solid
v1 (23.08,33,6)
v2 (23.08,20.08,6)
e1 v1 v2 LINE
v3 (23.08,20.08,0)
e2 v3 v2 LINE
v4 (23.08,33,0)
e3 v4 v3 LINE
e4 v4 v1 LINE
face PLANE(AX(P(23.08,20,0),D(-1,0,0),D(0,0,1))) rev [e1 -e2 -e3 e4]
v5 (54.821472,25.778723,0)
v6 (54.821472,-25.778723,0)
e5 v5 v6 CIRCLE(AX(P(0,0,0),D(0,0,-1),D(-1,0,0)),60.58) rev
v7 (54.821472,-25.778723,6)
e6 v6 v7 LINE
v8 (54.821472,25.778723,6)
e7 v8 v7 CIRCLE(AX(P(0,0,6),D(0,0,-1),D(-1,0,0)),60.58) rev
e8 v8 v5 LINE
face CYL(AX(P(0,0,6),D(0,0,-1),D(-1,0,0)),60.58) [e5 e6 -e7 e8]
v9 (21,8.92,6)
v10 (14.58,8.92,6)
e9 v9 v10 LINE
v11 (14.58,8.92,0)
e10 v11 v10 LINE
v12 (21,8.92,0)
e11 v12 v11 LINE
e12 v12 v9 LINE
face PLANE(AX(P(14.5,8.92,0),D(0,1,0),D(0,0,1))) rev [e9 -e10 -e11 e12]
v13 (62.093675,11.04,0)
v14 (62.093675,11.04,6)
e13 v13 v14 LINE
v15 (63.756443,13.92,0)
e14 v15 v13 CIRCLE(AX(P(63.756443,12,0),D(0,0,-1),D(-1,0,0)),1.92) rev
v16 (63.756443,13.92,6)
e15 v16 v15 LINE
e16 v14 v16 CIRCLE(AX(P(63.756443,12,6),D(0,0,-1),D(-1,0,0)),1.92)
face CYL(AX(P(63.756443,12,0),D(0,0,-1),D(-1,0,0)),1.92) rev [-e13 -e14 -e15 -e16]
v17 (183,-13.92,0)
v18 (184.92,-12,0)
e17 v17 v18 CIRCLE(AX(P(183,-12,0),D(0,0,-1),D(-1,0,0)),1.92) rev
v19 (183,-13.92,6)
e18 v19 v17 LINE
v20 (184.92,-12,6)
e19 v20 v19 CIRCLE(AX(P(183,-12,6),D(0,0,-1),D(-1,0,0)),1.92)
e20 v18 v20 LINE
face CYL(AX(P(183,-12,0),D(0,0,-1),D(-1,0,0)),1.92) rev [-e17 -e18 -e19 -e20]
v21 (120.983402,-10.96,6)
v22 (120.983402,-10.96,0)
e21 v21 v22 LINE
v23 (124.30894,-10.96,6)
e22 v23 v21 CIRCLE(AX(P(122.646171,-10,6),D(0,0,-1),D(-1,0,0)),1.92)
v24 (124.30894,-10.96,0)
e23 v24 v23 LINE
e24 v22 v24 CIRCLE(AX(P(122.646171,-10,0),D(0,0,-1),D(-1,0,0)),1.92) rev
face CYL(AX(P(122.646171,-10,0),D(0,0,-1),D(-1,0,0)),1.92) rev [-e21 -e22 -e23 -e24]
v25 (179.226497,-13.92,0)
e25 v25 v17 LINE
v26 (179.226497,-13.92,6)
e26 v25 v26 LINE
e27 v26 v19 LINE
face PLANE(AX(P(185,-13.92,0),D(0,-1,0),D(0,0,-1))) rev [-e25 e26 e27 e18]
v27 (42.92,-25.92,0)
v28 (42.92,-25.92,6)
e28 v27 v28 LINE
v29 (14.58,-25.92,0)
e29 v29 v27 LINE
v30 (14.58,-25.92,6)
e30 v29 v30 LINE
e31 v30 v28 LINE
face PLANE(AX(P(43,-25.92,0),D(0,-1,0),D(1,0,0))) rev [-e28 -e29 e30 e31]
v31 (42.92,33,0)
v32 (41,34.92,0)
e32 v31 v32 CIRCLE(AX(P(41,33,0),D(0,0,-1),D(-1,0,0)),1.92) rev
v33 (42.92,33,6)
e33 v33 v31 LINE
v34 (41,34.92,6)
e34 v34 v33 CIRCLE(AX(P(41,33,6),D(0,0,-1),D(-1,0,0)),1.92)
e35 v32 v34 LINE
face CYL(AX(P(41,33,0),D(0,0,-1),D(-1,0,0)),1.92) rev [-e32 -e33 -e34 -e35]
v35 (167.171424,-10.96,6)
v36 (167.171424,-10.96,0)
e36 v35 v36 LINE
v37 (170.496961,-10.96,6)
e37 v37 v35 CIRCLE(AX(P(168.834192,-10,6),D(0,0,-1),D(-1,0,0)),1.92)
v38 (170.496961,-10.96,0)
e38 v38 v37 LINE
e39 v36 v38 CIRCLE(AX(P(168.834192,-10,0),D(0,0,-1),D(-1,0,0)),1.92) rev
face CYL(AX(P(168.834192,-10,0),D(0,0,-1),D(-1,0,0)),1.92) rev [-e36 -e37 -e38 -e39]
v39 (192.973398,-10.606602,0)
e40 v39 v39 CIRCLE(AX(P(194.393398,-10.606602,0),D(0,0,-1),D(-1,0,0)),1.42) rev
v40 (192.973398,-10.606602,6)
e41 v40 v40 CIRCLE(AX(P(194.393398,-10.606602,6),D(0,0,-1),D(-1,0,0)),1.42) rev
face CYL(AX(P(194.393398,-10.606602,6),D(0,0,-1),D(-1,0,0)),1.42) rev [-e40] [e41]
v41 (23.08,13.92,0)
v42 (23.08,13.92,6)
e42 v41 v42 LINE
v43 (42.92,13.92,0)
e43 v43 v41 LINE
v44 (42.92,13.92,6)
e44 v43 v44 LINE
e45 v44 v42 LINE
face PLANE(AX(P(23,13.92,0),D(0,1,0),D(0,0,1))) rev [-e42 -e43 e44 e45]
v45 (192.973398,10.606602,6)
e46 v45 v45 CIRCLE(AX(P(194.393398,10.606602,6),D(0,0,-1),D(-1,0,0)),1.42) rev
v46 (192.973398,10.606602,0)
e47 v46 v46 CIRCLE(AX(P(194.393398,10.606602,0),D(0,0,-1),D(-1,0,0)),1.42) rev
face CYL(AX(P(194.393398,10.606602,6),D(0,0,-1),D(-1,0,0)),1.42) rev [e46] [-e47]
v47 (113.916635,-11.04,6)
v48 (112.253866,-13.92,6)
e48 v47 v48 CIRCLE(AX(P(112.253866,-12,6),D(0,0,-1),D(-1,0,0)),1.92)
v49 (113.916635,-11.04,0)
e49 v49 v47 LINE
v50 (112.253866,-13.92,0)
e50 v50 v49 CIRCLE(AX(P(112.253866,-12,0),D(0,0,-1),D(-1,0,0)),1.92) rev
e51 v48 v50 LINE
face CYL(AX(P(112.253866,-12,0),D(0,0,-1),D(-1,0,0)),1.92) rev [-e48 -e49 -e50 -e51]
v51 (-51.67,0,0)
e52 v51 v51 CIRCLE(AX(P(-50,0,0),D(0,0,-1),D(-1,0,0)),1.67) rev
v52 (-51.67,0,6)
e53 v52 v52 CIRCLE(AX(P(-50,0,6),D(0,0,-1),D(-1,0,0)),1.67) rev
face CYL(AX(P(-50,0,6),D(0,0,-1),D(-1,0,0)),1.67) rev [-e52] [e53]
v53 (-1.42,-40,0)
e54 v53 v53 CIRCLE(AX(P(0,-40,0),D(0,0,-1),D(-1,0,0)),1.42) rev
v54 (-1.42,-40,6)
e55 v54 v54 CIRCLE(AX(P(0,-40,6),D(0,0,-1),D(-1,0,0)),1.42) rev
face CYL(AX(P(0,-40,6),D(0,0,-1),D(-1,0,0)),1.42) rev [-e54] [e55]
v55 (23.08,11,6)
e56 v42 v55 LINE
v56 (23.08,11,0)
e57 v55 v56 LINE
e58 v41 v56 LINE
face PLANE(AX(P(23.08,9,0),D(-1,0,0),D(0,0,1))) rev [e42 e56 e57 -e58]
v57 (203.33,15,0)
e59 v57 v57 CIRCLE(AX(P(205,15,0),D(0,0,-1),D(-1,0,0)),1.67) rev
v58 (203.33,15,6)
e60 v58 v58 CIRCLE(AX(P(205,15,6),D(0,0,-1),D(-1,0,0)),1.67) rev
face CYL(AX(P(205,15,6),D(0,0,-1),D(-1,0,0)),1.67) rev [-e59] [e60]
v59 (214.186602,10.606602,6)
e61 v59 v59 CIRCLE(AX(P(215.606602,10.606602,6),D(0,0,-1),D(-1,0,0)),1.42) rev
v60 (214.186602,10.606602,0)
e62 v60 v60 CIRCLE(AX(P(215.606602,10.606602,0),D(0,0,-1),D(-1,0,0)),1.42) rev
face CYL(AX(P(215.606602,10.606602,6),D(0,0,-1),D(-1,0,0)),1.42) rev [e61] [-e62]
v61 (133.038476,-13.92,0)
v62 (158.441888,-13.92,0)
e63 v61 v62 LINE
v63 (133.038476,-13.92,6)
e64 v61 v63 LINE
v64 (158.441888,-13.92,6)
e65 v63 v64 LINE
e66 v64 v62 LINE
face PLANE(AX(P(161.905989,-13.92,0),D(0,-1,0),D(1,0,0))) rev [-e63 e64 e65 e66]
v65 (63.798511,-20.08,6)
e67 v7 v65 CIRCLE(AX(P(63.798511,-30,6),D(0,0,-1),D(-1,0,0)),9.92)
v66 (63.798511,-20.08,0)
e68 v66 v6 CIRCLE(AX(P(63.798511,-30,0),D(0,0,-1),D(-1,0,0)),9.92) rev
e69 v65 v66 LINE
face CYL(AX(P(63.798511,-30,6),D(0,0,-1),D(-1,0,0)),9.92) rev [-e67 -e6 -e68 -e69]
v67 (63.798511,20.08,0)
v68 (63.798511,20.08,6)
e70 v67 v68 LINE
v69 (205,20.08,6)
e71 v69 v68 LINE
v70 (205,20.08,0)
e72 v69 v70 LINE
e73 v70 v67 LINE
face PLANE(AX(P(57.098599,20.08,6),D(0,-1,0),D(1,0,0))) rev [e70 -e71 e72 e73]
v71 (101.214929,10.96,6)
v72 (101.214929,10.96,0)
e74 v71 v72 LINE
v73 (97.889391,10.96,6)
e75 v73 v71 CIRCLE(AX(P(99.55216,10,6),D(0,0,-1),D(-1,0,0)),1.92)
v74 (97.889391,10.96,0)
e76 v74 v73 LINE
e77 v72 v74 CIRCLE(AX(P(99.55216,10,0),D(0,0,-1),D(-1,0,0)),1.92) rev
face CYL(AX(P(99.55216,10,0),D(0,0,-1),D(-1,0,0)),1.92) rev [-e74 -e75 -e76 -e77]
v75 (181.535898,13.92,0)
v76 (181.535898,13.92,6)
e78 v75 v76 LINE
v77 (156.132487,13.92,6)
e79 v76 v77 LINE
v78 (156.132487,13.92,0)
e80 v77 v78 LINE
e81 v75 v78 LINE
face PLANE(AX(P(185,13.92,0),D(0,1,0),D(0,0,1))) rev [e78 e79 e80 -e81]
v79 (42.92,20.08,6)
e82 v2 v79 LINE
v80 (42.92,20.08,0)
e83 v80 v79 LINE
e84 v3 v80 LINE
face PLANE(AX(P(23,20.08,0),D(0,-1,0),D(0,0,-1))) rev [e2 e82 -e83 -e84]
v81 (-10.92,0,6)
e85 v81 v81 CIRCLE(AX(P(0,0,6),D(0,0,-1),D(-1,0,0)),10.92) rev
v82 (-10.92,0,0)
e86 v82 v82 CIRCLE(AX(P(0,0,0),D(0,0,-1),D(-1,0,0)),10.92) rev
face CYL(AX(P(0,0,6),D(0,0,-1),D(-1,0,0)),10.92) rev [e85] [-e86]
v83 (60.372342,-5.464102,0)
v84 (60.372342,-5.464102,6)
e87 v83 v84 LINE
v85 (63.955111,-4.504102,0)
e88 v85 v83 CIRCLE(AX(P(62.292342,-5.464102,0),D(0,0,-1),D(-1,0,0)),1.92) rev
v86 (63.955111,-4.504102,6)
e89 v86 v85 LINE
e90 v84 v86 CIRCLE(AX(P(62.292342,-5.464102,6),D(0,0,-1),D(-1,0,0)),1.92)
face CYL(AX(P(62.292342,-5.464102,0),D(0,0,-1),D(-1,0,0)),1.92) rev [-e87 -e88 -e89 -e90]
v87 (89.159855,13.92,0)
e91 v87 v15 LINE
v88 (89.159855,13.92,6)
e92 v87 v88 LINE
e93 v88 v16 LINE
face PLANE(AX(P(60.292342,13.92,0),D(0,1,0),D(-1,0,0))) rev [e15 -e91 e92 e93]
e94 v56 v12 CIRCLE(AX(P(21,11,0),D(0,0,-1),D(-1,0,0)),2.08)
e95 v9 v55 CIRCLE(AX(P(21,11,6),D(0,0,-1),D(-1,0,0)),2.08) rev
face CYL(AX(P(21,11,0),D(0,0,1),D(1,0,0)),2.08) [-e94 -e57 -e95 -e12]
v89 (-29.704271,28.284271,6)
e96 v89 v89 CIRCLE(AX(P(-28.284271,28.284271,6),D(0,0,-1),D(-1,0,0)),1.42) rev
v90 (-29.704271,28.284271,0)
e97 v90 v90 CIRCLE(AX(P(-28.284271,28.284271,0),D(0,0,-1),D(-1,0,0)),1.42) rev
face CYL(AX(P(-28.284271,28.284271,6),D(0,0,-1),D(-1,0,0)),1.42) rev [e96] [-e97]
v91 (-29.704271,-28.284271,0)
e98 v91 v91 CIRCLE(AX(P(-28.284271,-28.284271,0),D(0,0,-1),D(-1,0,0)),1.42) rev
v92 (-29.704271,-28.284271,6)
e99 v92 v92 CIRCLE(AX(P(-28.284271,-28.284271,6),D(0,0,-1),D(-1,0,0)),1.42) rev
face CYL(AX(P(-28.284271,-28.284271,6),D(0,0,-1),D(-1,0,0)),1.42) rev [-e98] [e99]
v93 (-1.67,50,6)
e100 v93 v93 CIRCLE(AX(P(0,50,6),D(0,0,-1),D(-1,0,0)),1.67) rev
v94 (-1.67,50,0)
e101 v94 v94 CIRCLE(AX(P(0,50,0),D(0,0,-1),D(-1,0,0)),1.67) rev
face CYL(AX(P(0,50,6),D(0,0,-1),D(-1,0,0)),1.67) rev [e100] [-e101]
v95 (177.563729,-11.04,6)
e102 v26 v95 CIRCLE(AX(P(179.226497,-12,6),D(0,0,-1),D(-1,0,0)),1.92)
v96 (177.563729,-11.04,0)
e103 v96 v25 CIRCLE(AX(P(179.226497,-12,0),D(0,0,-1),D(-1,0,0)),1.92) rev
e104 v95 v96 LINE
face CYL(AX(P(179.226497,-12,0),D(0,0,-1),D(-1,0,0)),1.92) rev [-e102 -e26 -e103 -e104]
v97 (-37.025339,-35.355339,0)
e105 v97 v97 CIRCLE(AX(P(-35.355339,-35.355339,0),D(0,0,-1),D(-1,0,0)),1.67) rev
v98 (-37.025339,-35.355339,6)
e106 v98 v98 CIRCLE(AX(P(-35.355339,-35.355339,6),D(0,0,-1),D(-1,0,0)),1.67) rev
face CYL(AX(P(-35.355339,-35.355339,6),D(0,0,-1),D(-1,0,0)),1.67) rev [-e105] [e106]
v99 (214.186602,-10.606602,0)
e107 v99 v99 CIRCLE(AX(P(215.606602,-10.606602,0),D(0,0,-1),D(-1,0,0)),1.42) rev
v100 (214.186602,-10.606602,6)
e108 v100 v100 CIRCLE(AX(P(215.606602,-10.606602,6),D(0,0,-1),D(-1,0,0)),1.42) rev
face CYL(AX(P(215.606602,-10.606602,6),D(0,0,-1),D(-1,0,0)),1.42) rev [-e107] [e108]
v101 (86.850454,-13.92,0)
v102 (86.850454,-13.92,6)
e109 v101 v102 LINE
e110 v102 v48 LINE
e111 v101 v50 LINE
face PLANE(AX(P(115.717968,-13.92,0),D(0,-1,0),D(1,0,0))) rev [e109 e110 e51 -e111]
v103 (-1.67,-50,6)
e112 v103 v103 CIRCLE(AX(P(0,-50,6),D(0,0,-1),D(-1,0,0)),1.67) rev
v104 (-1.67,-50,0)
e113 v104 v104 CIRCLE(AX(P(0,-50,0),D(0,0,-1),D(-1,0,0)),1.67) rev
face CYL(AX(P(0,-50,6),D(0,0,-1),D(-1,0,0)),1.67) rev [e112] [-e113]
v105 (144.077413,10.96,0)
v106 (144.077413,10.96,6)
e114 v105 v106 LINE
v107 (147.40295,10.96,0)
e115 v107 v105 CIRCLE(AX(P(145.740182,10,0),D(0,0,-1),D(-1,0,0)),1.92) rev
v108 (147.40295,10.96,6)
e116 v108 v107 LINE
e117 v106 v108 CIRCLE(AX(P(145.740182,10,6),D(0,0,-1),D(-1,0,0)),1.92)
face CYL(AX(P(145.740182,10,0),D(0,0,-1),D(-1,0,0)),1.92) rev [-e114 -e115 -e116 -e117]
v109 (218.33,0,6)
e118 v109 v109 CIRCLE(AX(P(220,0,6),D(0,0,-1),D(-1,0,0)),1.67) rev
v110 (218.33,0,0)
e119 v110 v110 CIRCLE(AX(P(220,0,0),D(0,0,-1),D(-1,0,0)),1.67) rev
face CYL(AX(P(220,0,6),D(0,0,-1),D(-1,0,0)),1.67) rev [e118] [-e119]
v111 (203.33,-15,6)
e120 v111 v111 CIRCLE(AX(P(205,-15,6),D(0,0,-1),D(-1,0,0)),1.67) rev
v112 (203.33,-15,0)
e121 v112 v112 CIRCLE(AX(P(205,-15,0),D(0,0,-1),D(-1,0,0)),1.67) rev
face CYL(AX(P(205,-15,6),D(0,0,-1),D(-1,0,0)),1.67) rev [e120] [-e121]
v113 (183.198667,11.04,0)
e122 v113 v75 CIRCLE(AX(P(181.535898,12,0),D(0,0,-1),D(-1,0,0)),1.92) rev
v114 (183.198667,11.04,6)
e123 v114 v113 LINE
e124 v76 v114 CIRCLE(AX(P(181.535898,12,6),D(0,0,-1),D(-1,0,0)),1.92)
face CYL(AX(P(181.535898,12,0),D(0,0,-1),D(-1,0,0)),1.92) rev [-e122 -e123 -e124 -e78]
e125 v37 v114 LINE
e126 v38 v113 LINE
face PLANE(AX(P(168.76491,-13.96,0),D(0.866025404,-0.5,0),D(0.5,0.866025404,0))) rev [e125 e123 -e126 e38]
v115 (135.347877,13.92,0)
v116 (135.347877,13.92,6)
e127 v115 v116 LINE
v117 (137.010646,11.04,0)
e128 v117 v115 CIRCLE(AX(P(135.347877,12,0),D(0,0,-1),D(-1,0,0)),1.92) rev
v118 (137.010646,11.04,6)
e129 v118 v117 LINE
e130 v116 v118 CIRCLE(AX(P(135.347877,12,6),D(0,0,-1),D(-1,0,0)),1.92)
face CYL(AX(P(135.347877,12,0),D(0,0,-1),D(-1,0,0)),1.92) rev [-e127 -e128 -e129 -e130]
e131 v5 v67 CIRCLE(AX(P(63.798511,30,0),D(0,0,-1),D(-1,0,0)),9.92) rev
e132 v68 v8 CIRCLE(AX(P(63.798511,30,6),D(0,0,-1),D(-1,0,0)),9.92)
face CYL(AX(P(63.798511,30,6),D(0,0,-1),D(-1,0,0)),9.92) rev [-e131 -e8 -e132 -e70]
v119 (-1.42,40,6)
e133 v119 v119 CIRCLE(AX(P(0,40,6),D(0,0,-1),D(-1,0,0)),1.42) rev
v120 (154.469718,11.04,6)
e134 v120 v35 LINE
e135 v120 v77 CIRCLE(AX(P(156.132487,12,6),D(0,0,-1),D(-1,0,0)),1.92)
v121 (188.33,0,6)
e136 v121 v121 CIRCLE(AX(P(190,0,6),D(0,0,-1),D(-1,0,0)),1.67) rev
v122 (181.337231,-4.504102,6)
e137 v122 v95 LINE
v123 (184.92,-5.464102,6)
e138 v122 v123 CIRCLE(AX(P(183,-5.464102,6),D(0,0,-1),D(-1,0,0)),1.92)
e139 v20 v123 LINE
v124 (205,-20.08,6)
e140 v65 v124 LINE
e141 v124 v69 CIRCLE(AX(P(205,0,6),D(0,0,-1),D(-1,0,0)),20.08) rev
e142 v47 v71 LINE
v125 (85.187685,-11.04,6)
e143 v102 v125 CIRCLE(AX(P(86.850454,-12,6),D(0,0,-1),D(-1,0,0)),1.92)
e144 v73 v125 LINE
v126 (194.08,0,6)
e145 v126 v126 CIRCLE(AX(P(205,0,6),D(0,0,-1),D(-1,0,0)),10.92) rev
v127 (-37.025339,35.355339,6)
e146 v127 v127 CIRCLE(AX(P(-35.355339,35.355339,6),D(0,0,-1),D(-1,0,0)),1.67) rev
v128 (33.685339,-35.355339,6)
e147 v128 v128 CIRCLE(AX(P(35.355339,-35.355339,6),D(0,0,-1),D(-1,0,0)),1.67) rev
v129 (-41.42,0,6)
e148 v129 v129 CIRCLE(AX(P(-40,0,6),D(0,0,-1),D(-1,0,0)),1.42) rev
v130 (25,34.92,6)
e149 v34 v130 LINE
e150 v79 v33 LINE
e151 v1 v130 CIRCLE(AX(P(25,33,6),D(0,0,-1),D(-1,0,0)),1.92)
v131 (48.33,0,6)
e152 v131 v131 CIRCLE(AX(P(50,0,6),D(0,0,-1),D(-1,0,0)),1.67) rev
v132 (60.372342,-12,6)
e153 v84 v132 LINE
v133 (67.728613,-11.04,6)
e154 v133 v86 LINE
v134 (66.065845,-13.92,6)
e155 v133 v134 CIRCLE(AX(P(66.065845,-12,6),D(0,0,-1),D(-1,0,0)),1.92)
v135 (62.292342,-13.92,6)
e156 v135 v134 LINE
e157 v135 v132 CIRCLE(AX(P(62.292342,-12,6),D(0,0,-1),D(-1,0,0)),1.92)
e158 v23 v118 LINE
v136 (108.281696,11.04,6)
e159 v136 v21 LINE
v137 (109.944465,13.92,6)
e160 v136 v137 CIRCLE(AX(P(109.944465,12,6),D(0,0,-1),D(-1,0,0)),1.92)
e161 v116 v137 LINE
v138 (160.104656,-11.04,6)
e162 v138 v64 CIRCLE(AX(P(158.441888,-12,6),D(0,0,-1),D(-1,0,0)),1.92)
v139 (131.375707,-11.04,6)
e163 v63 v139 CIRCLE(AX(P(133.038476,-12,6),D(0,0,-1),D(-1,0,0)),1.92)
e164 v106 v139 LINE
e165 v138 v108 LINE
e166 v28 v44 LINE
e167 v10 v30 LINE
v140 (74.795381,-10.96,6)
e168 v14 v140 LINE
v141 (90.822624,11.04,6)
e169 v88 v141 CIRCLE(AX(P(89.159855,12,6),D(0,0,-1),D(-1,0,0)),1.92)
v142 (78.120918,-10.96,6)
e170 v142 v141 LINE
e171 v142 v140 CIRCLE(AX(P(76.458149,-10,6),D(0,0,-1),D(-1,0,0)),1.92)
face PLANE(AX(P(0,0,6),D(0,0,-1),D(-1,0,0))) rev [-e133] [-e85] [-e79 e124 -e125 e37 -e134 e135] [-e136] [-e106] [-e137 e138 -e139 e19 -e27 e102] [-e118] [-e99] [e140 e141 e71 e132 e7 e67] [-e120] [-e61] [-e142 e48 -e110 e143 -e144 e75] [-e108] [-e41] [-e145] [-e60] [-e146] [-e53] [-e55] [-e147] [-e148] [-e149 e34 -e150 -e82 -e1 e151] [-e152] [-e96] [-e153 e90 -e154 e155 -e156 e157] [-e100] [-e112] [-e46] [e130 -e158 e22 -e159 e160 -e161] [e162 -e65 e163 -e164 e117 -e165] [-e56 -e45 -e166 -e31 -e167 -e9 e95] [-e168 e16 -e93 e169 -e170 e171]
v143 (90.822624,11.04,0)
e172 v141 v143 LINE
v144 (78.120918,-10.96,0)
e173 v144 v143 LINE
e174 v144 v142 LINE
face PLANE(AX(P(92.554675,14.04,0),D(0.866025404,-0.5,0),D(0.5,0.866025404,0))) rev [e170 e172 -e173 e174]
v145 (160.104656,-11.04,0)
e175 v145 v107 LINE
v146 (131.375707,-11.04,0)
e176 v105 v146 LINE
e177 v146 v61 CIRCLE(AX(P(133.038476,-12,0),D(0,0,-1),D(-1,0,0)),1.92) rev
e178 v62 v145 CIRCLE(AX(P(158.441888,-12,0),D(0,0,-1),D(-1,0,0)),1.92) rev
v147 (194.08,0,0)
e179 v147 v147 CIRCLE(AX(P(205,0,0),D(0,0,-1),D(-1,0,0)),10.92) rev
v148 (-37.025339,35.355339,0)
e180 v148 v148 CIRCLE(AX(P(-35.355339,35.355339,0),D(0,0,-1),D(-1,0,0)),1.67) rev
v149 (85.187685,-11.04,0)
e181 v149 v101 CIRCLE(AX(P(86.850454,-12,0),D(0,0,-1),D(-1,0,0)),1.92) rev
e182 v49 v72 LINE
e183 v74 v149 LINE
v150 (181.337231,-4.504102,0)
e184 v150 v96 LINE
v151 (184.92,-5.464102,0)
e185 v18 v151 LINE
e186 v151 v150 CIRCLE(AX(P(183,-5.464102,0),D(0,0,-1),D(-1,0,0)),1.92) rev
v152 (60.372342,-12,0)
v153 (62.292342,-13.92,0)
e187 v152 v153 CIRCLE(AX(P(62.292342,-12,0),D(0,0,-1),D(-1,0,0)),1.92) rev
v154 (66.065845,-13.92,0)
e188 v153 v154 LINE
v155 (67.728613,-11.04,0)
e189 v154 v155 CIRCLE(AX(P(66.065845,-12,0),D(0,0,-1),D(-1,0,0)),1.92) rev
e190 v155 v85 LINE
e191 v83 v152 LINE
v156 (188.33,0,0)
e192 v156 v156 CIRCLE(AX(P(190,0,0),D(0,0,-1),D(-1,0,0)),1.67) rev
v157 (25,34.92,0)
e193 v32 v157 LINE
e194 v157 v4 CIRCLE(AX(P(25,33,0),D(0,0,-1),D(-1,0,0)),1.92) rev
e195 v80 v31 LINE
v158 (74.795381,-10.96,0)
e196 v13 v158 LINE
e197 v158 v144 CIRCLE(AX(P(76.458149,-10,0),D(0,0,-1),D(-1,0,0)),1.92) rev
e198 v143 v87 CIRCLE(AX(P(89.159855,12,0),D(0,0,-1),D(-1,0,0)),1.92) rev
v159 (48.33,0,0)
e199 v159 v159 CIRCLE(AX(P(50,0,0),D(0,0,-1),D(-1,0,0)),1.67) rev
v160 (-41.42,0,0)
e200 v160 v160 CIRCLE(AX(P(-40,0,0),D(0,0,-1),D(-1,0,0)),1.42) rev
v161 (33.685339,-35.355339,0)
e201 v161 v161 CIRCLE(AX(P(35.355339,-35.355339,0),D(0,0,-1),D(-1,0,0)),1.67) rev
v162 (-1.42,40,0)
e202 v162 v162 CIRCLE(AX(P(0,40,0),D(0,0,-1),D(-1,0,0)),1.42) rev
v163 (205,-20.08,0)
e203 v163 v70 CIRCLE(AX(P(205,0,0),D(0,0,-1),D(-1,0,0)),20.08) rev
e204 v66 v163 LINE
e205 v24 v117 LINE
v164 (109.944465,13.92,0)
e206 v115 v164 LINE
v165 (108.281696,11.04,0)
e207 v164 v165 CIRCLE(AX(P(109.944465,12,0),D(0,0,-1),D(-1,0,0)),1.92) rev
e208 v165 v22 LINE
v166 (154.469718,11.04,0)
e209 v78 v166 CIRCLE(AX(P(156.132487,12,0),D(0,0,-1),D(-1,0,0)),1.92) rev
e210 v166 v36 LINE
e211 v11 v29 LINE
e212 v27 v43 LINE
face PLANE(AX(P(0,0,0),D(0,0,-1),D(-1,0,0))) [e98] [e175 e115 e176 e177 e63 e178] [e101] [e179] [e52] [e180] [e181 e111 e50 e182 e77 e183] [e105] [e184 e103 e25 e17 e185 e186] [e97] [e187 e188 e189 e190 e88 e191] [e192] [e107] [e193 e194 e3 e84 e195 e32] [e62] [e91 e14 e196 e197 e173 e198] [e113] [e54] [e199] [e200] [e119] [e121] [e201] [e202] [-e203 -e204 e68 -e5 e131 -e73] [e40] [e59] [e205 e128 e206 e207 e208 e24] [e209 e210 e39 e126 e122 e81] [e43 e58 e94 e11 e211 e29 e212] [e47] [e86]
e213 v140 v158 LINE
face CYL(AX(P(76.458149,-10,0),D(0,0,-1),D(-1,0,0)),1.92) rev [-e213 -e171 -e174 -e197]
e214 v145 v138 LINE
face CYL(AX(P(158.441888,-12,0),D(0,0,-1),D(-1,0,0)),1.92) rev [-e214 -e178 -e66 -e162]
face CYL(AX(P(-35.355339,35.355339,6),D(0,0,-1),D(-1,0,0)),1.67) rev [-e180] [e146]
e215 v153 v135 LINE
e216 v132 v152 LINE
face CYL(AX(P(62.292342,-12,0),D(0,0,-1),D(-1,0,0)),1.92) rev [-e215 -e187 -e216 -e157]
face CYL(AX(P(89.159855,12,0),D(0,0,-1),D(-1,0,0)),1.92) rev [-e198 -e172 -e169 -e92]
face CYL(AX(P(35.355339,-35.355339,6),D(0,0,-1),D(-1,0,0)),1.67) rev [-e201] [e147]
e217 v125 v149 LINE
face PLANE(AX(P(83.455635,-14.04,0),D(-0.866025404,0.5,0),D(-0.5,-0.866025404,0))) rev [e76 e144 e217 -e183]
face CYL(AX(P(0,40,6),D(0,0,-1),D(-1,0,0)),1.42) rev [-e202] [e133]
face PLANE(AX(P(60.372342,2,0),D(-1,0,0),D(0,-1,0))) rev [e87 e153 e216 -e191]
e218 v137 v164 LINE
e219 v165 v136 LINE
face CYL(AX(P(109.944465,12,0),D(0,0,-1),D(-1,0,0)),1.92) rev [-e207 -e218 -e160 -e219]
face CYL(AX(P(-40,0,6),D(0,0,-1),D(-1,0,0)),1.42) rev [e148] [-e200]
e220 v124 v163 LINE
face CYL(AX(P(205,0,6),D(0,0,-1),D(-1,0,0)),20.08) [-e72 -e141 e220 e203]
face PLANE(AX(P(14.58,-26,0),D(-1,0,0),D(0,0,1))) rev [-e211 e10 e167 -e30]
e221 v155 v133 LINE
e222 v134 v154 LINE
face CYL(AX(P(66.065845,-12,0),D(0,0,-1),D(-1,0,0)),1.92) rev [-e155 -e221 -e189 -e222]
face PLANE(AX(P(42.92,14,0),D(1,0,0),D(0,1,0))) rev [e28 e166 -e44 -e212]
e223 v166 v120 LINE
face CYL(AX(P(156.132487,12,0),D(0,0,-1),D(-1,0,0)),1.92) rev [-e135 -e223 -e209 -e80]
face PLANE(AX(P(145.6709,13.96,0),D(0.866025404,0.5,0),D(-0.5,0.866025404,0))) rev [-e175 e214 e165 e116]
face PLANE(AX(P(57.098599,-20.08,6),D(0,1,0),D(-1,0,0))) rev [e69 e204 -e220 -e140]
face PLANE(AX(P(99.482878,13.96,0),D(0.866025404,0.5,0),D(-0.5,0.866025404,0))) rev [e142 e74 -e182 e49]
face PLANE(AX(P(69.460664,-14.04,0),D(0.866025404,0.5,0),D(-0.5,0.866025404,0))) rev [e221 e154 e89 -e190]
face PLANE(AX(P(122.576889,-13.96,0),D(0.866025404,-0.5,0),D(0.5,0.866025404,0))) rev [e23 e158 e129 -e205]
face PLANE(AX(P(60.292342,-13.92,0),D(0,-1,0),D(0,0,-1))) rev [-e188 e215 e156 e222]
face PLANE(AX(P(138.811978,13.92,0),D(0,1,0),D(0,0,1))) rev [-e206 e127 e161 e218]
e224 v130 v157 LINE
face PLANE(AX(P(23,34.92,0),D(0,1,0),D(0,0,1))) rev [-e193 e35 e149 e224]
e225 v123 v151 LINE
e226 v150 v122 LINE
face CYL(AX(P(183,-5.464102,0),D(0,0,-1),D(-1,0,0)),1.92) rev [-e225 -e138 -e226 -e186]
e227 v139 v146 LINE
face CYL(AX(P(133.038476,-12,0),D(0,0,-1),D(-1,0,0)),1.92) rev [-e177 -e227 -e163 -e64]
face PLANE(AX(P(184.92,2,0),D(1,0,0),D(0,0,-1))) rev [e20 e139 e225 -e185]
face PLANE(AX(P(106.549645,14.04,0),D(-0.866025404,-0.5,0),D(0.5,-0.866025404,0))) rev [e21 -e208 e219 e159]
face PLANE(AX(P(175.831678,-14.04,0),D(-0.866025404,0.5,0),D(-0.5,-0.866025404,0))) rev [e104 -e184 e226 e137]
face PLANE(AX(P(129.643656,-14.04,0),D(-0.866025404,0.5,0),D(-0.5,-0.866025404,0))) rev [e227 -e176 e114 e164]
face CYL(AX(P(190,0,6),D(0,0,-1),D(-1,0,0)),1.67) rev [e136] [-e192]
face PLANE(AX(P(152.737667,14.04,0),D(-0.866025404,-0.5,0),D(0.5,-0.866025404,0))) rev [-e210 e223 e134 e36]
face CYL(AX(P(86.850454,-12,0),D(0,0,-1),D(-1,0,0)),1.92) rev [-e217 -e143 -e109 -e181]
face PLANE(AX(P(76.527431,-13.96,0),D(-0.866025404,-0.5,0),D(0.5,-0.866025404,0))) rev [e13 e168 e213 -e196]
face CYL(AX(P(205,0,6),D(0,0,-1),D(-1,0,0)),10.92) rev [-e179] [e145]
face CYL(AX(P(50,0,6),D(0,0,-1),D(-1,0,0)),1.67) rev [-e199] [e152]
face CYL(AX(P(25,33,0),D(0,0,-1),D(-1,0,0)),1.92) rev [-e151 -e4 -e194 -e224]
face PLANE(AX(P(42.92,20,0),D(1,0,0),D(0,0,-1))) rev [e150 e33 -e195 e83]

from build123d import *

# Parameters (mm, degrees)
SKETCH1_R              = 11
SKETCH1_R_2            = 1.75
SKETCH1_R_3            = 1.5
BOSS_EXTRUDE1_DEPTH    = 6
SKETCH2_W              = 20
SKETCH2_H              = 15
CUT_EXTRUDE1_DEPTH     = 234.069195734
FILLET1_R              = 2
FILLET2_R              = 10
CUT_EXTRUDE2_DEPTH     = 234.069195734
FILLET3_R              = 2
MOVE_FACE1_OUTLINE_R   = 11
MOVE_FACE1_OUTLINE_R_2 = 10.92
MOVE_FACE1_OUTLINE_R_3 = 1.75
MOVE_FACE1_OUTLINE_R_4 = 1.67
MOVE_FACE1_OUTLINE_R_5 = 1.5
MOVE_FACE1_OUTLINE_R_6 = 1.42
MOVE_FACE1_DEPTH       = 6


# Read off the part's stored shape, not the designer's step: Move Face1
with BuildPart() as part:
    # Sketch1 → Boss-Extrude1 (new body)
    with BuildSketch(Plane.XY):
        with BuildLine():
            Line((57.098598932, -20), (205, -20))
            ThreePointArc((205, -20), (225, 0), (205, 20))
            Line((205, 20), (57.098598932, 20))
            ThreePointArc((57.098598932, 20), (-60.5, 0), (57.098598932, -20))
        make_face()
        Circle(SKETCH1_R, mode=Mode.SUBTRACT)
        with Locations((205, 0)):
            Circle(SKETCH1_R, mode=Mode.SUBTRACT)
        with Locations((205, -15)):
            Circle(SKETCH1_R_2, mode=Mode.SUBTRACT)
        with Locations((215.606601718, -10.606601718)):
            Circle(SKETCH1_R_3, mode=Mode.SUBTRACT)
        with Locations((190, 0)):
            Circle(SKETCH1_R_2, mode=Mode.SUBTRACT)
        with Locations((194.393398282, -10.606601718)):
            Circle(SKETCH1_R_3, mode=Mode.SUBTRACT)
        with Locations((205, 15)):
            Circle(SKETCH1_R_2, mode=Mode.SUBTRACT)
        with Locations((194.393398282, 10.606601718)):
            Circle(SKETCH1_R_3, mode=Mode.SUBTRACT)
        with Locations((220, 0)):
            Circle(SKETCH1_R_2, mode=Mode.SUBTRACT)
        with Locations((215.606601718, 10.606601718)):
            Circle(SKETCH1_R_3, mode=Mode.SUBTRACT)
        with Locations((0, -40)):
            Circle(SKETCH1_R_3, mode=Mode.SUBTRACT)
        with Locations((0, -50)):
            Circle(SKETCH1_R_2, mode=Mode.SUBTRACT)
        with Locations((-28.284271247, -28.284271247)):
            Circle(SKETCH1_R_3, mode=Mode.SUBTRACT)
        with Locations((-35.355339059, -35.355339059)):
            Circle(SKETCH1_R_2, mode=Mode.SUBTRACT)
        with Locations((-40, 0)):
            Circle(SKETCH1_R_3, mode=Mode.SUBTRACT)
        with Locations((-50, 0)):
            Circle(SKETCH1_R_2, mode=Mode.SUBTRACT)
        with Locations((-28.284271247, 28.284271247)):
            Circle(SKETCH1_R_3, mode=Mode.SUBTRACT)
        with Locations((-35.355339059, 35.355339059)):
            Circle(SKETCH1_R_2, mode=Mode.SUBTRACT)
        with Locations((0, 40)):
            Circle(SKETCH1_R_3, mode=Mode.SUBTRACT)
        with Locations((0, 50)):
            Circle(SKETCH1_R_2, mode=Mode.SUBTRACT)
        with Locations((50, 0)):
            Circle(SKETCH1_R_2, mode=Mode.SUBTRACT)
        with Locations((35.355339059, -35.355339059)):
            Circle(SKETCH1_R_2, mode=Mode.SUBTRACT)
    extrude(amount=BOSS_EXTRUDE1_DEPTH)

    # Sketch2 → Cut-Extrude1 (cut, through all)
    with BuildSketch(Plane.XY.offset(6)):
        Polygon((23, 14), (43, 14), (43, -26), (14.5, -26), (14.5, 9), (23, 9), align=None)
        with Locations((33, 27.5)):
            Rectangle(SKETCH2_W, SKETCH2_H)
    extrude(amount=-CUT_EXTRUDE1_DEPTH, mode=Mode.SUBTRACT)

    # Fillet1
    fillet1_edges = [part.edges().sort_by_distance(p)[0] for p in [
        (23, 35, 3),
        (43, 35, 3),
        (23, 9, 3),
    ]]
    fillet(fillet1_edges, radius=FILLET1_R)

    # Fillet2
    fillet2_edges = [part.edges().sort_by_distance(p)[0] for p in [
        (57.098598932, 20, 3),
        (57.098598932, -20, 3),
    ]]
    fillet(fillet2_edges, radius=FILLET2_R)

    # Sketch3 → Cut-Extrude2 (cut, through all)
    with BuildSketch(Plane.XY.offset(6)):
        Polygon((60.292341855, 14), (92.62395693, 14), (76.458149392, -14), align=None)
        Polygon((83.386352623, -14), (99.55216016, 14), (115.717967697, -14), align=None)
        Polygon((106.48036339, 14), (122.646170928, -14), (138.811978465, 14), align=None)
        Polygon((129.574374158, -14), (145.740181695, 14), (161.905989232, -14), align=None)
        Polygon((152.668384925, 14), (168.834192463, -14), (185, 14), align=None)
        Polygon((60.292341855, 2), (60.292341855, -14), (69.529946162, -14), align=None)
        Polygon((185, 2), (185, -14), (175.762395693, -14), align=None)
    extrude(amount=-CUT_EXTRUDE2_DEPTH, mode=Mode.SUBTRACT)

    # Fillet3
    fillet3_edges = [part.edges().sort_by_distance(p)[0] for p in [
        (76.458149392, -14, 3),
        (60.292341855, 14, 3),
        (92.62395693, 14, 3),
        (115.717967697, -14, 3),
        (83.386352623, -14, 3),
        (99.55216016, 14, 3),
        (106.48036339, 14, 3),
        (138.811978465, 14, 3),
        (122.646170928, -14, 3),
        (161.905989232, -14, 3),
        (129.574374158, -14, 3),
        (145.740181695, 14, 3),
        (152.668384925, 14, 3),
        (185, 14, 3),
        (168.834192463, -14, 3),
        (60.292341855, 2, 3),
        (69.529946162, -14, 3),
        (60.292341855, -14, 3),
        (175.762395693, -14, 3),
        (185, 2, 3),
        (185, -14, 3),
    ]]
    fillet(fillet3_edges, radius=FILLET3_R)

    # Move Face1 outline → Move Face1 (add)
    # profile 1 of 32: a face of its own
    with BuildSketch(Plane.XY):
        with BuildLine():
            ThreePointArc((54.82147225, 25.778723404), (-60.58, 0), (54.82147225, -25.778723404))
            ThreePointArc((54.82147225, -25.778723404), (58.481964323, -21.624993617), (63.798510954, -20.08))
            Line((63.798510954, -20.08), (205, -20.08))
            ThreePointArc((205, -20.08), (225.08, 0), (205, 20.08))
            Line((205, 20.08), (63.798510954, 20.08))
            ThreePointArc((63.798510954, 20.08), (58.481964323, 21.624993617), (54.82147225, 25.778723404))
        make_face()
        with BuildLine():
            ThreePointArc((63.798510954, -20), (58.439088947, -21.557453243), (54.749076776, -25.744680851))
            ThreePointArc((54.749076776, -25.744680851), (-60.5, 0), (54.749076776, 25.744680851))
            ThreePointArc((54.749076776, 25.744680851), (58.439088947, 21.557453243), (63.798510954, 20))
            Line((63.798510954, 20), (205, 20))
            ThreePointArc((205, 20), (225, 0), (205, -20))
            Line((205, -20), (63.798510954, -20))
        make_face(mode=Mode.SUBTRACT)
    # profile 2 of 32: a face of its own
    with BuildSketch(Plane.XY):
        with BuildLine():
            Line((23, 33), (23, 20))
            Line((23, 20), (43, 20))
            Line((43, 20), (43, 33))
            ThreePointArc((43, 33), (42.414213562, 34.414213562), (41, 35))
            Line((41, 35), (25, 35))
            ThreePointArc((25, 35), (23.585786438, 34.414213562), (23, 33))
        make_face()
        with BuildLine():
            Line((42.92, 20.08), (23.08, 20.08))
            Line((23.08, 20.08), (23.08, 33))
            ThreePointArc((23.08, 33), (23.64235498, 34.35764502), (25, 34.92))
            Line((25, 34.92), (41, 34.92))
            ThreePointArc((41, 34.92), (42.35764502, 34.35764502), (42.92, 33))
            Line((42.92, 33), (42.92, 20.08))
        make_face(mode=Mode.SUBTRACT)
    # profile 3 of 32: a face of its own
    with BuildSketch(Plane.XY):
        Circle(MOVE_FACE1_OUTLINE_R)
        Circle(MOVE_FACE1_OUTLINE_R_2, mode=Mode.SUBTRACT)
    # profile 4 of 32: a face of its own
    with BuildSketch(Plane.XY):
        with Locations((205, 0)):
            Circle(MOVE_FACE1_OUTLINE_R)
        with Locations((205, 0)):
            Circle(MOVE_FACE1_OUTLINE_R_2, mode=Mode.SUBTRACT)
    # profile 5 of 32: a face of its own
    with BuildSketch(Plane.XY):
        with Locations((205, -15)):
            Circle(MOVE_FACE1_OUTLINE_R_3)
        with Locations((205, -15)):
            Circle(MOVE_FACE1_OUTLINE_R_4, mode=Mode.SUBTRACT)
    # profile 6 of 32: a face of its own
    with BuildSketch(Plane.XY):
        with Locations((215.606601718, -10.606601718)):
            Circle(MOVE_FACE1_OUTLINE_R_5)
        with Locations((215.606601718, -10.606601718)):
            Circle(MOVE_FACE1_OUTLINE_R_6, mode=Mode.SUBTRACT)
    # profile 7 of 32: a face of its own
    with BuildSketch(Plane.XY):
        with Locations((190, 0)):
            Circle(MOVE_FACE1_OUTLINE_R_3)
        with Locations((190, 0)):
            Circle(MOVE_FACE1_OUTLINE_R_4, mode=Mode.SUBTRACT)
    # profile 8 of 32: a face of its own
    with BuildSketch(Plane.XY):
        with Locations((194.393398282, -10.606601718)):
            Circle(MOVE_FACE1_OUTLINE_R_5)
        with Locations((194.393398282, -10.606601718)):
            Circle(MOVE_FACE1_OUTLINE_R_6, mode=Mode.SUBTRACT)
    # profile 9 of 32: a face of its own
    with BuildSketch(Plane.XY):
        with Locations((205, 15)):
            Circle(MOVE_FACE1_OUTLINE_R_3)
        with Locations((205, 15)):
            Circle(MOVE_FACE1_OUTLINE_R_4, mode=Mode.SUBTRACT)
    # profile 10 of 32: a face of its own
    with BuildSketch(Plane.XY):
        with Locations((194.393398282, 10.606601718)):
            Circle(MOVE_FACE1_OUTLINE_R_5)
        with Locations((194.393398282, 10.606601718)):
            Circle(MOVE_FACE1_OUTLINE_R_6, mode=Mode.SUBTRACT)
    # profile 11 of 32: a face of its own
    with BuildSketch(Plane.XY):
        with Locations((220, 0)):
            Circle(MOVE_FACE1_OUTLINE_R_3)
        with Locations((220, 0)):
            Circle(MOVE_FACE1_OUTLINE_R_4, mode=Mode.SUBTRACT)
    # profile 12 of 32: a face of its own
    with BuildSketch(Plane.XY):
        with Locations((215.606601718, 10.606601718)):
            Circle(MOVE_FACE1_OUTLINE_R_5)
        with Locations((215.606601718, 10.606601718)):
            Circle(MOVE_FACE1_OUTLINE_R_6, mode=Mode.SUBTRACT)
    # profile 13 of 32: a face of its own
    with BuildSketch(Plane.XY):
        with Locations((0, -40)):
            Circle(MOVE_FACE1_OUTLINE_R_5)
        with Locations((0, -40)):
            Circle(MOVE_FACE1_OUTLINE_R_6, mode=Mode.SUBTRACT)
    # profile 14 of 32: a face of its own
    with BuildSketch(Plane.XY):
        with Locations((0, -50)):
            Circle(MOVE_FACE1_OUTLINE_R_3)
        with Locations((0, -50)):
            Circle(MOVE_FACE1_OUTLINE_R_4, mode=Mode.SUBTRACT)
    # profile 15 of 32: a face of its own
    with BuildSketch(Plane.XY):
        with Locations((-28.284271247, -28.284271247)):
            Circle(MOVE_FACE1_OUTLINE_R_5)
        with Locations((-28.284271247, -28.284271247)):
            Circle(MOVE_FACE1_OUTLINE_R_6, mode=Mode.SUBTRACT)
    # profile 16 of 32: a face of its own
    with BuildSketch(Plane.XY):
        with Locations((-35.355339059, -35.355339059)):
            Circle(MOVE_FACE1_OUTLINE_R_3)
        with Locations((-35.355339059, -35.355339059)):
            Circle(MOVE_FACE1_OUTLINE_R_4, mode=Mode.SUBTRACT)
    # profile 17 of 32: a face of its own
    with BuildSketch(Plane.XY):
        with Locations((-40, 0)):
            Circle(MOVE_FACE1_OUTLINE_R_5)
        with Locations((-40, 0)):
            Circle(MOVE_FACE1_OUTLINE_R_6, mode=Mode.SUBTRACT)
    # profile 18 of 32: a face of its own
    with BuildSketch(Plane.XY):
        with Locations((-50, 0)):
            Circle(MOVE_FACE1_OUTLINE_R_3)
        with Locations((-50, 0)):
            Circle(MOVE_FACE1_OUTLINE_R_4, mode=Mode.SUBTRACT)
    # profile 19 of 32: a face of its own
    with BuildSketch(Plane.XY):
        with Locations((-28.284271247, 28.284271247)):
            Circle(MOVE_FACE1_OUTLINE_R_5)
        with Locations((-28.284271247, 28.284271247)):
            Circle(MOVE_FACE1_OUTLINE_R_6, mode=Mode.SUBTRACT)
    # profile 20 of 32: a face of its own
    with BuildSketch(Plane.XY):
        with Locations((-35.355339059, 35.355339059)):
            Circle(MOVE_FACE1_OUTLINE_R_3)
        with Locations((-35.355339059, 35.355339059)):
            Circle(MOVE_FACE1_OUTLINE_R_4, mode=Mode.SUBTRACT)
    # profile 21 of 32: a face of its own
    with BuildSketch(Plane.XY):
        with Locations((0, 40)):
            Circle(MOVE_FACE1_OUTLINE_R_5)
        with Locations((0, 40)):
            Circle(MOVE_FACE1_OUTLINE_R_6, mode=Mode.SUBTRACT)
    # profile 22 of 32: a face of its own
    with BuildSketch(Plane.XY):
        with Locations((0, 50)):
            Circle(MOVE_FACE1_OUTLINE_R_3)
        with Locations((0, 50)):
            Circle(MOVE_FACE1_OUTLINE_R_4, mode=Mode.SUBTRACT)
    # profile 23 of 32: a face of its own
    with BuildSketch(Plane.XY):
        with Locations((50, 0)):
            Circle(MOVE_FACE1_OUTLINE_R_3)
        with Locations((50, 0)):
            Circle(MOVE_FACE1_OUTLINE_R_4, mode=Mode.SUBTRACT)
    # profile 24 of 32: a face of its own
    with BuildSketch(Plane.XY):
        with Locations((35.355339059, -35.355339059)):
            Circle(MOVE_FACE1_OUTLINE_R_3)
        with Locations((35.355339059, -35.355339059)):
            Circle(MOVE_FACE1_OUTLINE_R_4, mode=Mode.SUBTRACT)
    # profile 25 of 32: a face of its own
    with BuildSketch(Plane.XY):
        with BuildLine():
            Line((43, 14), (23, 14))
            Line((23, 14), (23, 11))
            ThreePointArc((23, 11), (22.414213562, 9.585786438), (21, 9))
            Line((21, 9), (14.5, 9))
            Line((14.5, 9), (14.5, -26))
            Line((14.5, -26), (43, -26))
            Line((43, -26), (43, 14))
        make_face()
        with BuildLine():
            Line((23.08, 11), (23.08, 13.92))
            Line((23.08, 13.92), (42.92, 13.92))
            Line((42.92, 13.92), (42.92, -25.92))
            Line((42.92, -25.92), (14.58, -25.92))
            Line((14.58, -25.92), (14.58, 8.92))
            Line((14.58, 8.92), (21, 8.92))
            ThreePointArc((21, 8.92), (22.470782105, 9.529217895), (23.08, 11))
        make_face(mode=Mode.SUBTRACT)
    # profile 26 of 32: a face of its own
    with BuildSketch(Plane.XY):
        with BuildLine():
            ThreePointArc((90.891906122, 11), (90.891906122, 13), (89.159855315, 14))
            Line((89.159855315, 14), (63.75644347, 14))
            ThreePointArc((63.75644347, 14), (62.024392663, 13), (62.024392663, 11))
            Line((62.024392663, 11), (74.726098585, -11))
            ThreePointArc((74.726098585, -11), (76.458149392, -12), (78.1902002, -11))
            Line((78.1902002, -11), (90.891906122, 11))
        make_face()
        with BuildLine():
            Line((63.75644347, 13.92), (89.159855315, 13.92))
            ThreePointArc((89.159855315, 13.92), (90.82262409, 12.96), (90.82262409, 11.04))
            Line((90.82262409, 11.04), (78.120918168, -10.96))
            ThreePointArc((78.120918168, -10.96), (76.458149393, -11.92), (74.795380617, -10.96))
            Line((74.795380617, -10.96), (62.093674695, 11.04))
            ThreePointArc((62.093674695, 11.04), (62.093674695, 12.96), (63.75644347, 13.92))
        make_face(mode=Mode.SUBTRACT)
    # profile 27 of 32: a face of its own
    with BuildSketch(Plane.XY):
        with BuildLine():
            ThreePointArc((137.079927657, 11), (137.079927657, 13), (135.34787685, 14))
            Line((135.34787685, 14), (109.944465005, 14))
            ThreePointArc((109.944465005, 14), (108.212414198, 13), (108.212414198, 11))
            Line((108.212414198, 11), (120.91412012, -11))
            ThreePointArc((120.91412012, -11), (122.646170928, -12), (124.378221735, -11))
            Line((124.378221735, -11), (137.079927657, 11))
        make_face()
        with BuildLine():
            Line((109.944465005, 13.92), (135.34787685, 13.92))
            ThreePointArc((135.34787685, 13.92), (137.010645625, 12.96), (137.010645625, 11.04))
            Line((137.010645625, 11.04), (124.308939703, -10.96))
            ThreePointArc((124.308939703, -10.96), (122.646170927, -11.92), (120.983402152, -10.96))
            Line((120.983402152, -10.96), (108.28169623, 11.04))
            ThreePointArc((108.28169623, 11.04), (108.28169623, 12.96), (109.944465005, 13.92))
        make_face(mode=Mode.SUBTRACT)
    # profile 28 of 32: a face of its own
    with BuildSketch(Plane.XY):
        with BuildLine():
            ThreePointArc((183.267949192, 11), (183.267949192, 13), (181.535898385, 14))
            Line((181.535898385, 14), (156.132486541, 14))
            ThreePointArc((156.132486541, 14), (154.400435733, 13), (154.400435733, 11))
            Line((154.400435733, 11), (167.102141655, -11))
            ThreePointArc((167.102141655, -11), (168.834192462, -12), (170.56624327, -11))
            Line((170.56624327, -11), (183.267949192, 11))
        make_face()
        with BuildLine():
            Line((156.132486541, 13.92), (181.535898385, 13.92))
            ThreePointArc((181.535898385, 13.92), (183.19866716, 12.96), (183.19866716, 11.04))
            Line((183.19866716, 11.04), (170.496961238, -10.96))
            ThreePointArc((170.496961238, -10.96), (168.834192462, -11.92), (167.171423687, -10.96))
            Line((167.171423687, -10.96), (154.469717765, 11.04))
            ThreePointArc((154.469717765, 11.04), (154.469717765, 12.96), (156.132486541, 13.92))
        make_face(mode=Mode.SUBTRACT)
    # profile 29 of 32: a face of its own
    with BuildSketch(Plane.XY):
        with BuildLine():
            ThreePointArc((85.11840343, -11), (85.11840343, -13), (86.850454238, -14))
            Line((86.850454238, -14), (112.253866082, -14))
            ThreePointArc((112.253866082, -14), (113.98591689, -13), (113.98591689, -11))
            Line((113.98591689, -11), (101.284210968, 11))
            ThreePointArc((101.284210968, 11), (99.55216016, 12), (97.820109352, 11))
            Line((97.820109352, 11), (85.11840343, -11))
        make_face()
        with BuildLine():
            Line((112.253866082, -13.92), (86.850454238, -13.92))
            ThreePointArc((86.850454238, -13.92), (85.187685462, -12.96), (85.187685462, -11.04))
            Line((85.187685462, -11.04), (97.889391385, 10.96))
            ThreePointArc((97.889391385, 10.96), (99.55216016, 11.92), (101.214928935, 10.96))
            Line((101.214928935, 10.96), (113.916634857, -11.04))
            ThreePointArc((113.916634857, -11.04), (113.916634857, -12.96), (112.253866082, -13.92))
        make_face(mode=Mode.SUBTRACT)
    # profile 30 of 32: a face of its own
    with BuildSketch(Plane.XY):
        with BuildLine():
            ThreePointArc((131.306424965, -11), (131.306424965, -13), (133.038475773, -14))
            Line((133.038475773, -14), (158.441887617, -14))
            ThreePointArc((158.441887617, -14), (160.173938425, -13), (160.173938425, -11))
            Line((160.173938425, -11), (147.472232503, 11))
            ThreePointArc((147.472232503, 11), (145.740181696, 12), (144.008130888, 11))
            Line((144.008130888, 11), (131.306424965, -11))
        make_face()
        with BuildLine():
            Line((158.441887617, -13.92), (133.038475773, -13.92))
            ThreePointArc((133.038475773, -13.92), (131.375706998, -12.96), (131.375706998, -11.04))
            Line((131.375706998, -11.04), (144.07741292, 10.96))
            ThreePointArc((144.07741292, 10.96), (145.740181695, 11.92), (147.40295047, 10.96))
            Line((147.40295047, 10.96), (160.104656393, -11.04))
            ThreePointArc((160.104656393, -11.04), (160.104656393, -12.96), (158.441887617, -13.92))
        make_face(mode=Mode.SUBTRACT)
    # profile 31 of 32: a face of its own
    with BuildSketch(Plane.XY):
        with BuildLine():
            ThreePointArc((60.292341855, -12), (60.878128293, -13.414213562), (62.292341855, -14))
            Line((62.292341855, -14), (66.065844547, -14))
            ThreePointArc((66.065844547, -14), (67.797895355, -13), (67.797895355, -11))
            Line((67.797895355, -11), (64.024392663, -4.464101615))
            ThreePointArc((64.024392663, -4.464101615), (61.774703765, -3.532249963), (60.292341855, -5.464101615))
            Line((60.292341855, -5.464101615), (60.292341855, -12))
        make_face()
        with BuildLine():
            Line((66.065844547, -13.92), (62.292341855, -13.92))
            ThreePointArc((62.292341855, -13.92), (60.934696835, -13.35764502), (60.372341855, -12))
            Line((60.372341855, -12), (60.372341855, -5.464101615))
            ThreePointArc((60.372341855, -5.464101615), (61.795409288, -3.609524029), (63.95511063, -4.504101615))
            Line((63.95511063, -4.504101615), (67.728613322, -11.04))
            ThreePointArc((67.728613322, -11.04), (67.728613322, -12.96), (66.065844547, -13.92))
        make_face(mode=Mode.SUBTRACT)
    # profile 32 of 32: a face of its own
    with BuildSketch(Plane.XY):
        with BuildLine():
            ThreePointArc((177.494446501, -11), (177.494446501, -13), (179.226497308, -14))
            Line((179.226497308, -14), (183, -14))
            ThreePointArc((183, -14), (184.414213562, -13.414213562), (185, -12))
            Line((185, -12), (185, -5.464101615))
            ThreePointArc((185, -5.464101615), (183.51763809, -3.532249963), (181.267949192, -4.464101615))
            Line((181.267949192, -4.464101615), (177.494446501, -11))
        make_face()
        with BuildLine():
            Line((183, -13.92), (179.226497308, -13.92))
            ThreePointArc((179.226497308, -13.92), (177.563728533, -12.96), (177.563728533, -11.04))
            Line((177.563728533, -11.04), (181.337231225, -4.504101615))
            ThreePointArc((181.337231225, -4.504101615), (183.496932567, -3.609524029), (184.92, -5.464101615))
            Line((184.92, -5.464101615), (184.92, -12))
            ThreePointArc((184.92, -12), (184.35764502, -13.35764502), (183, -13.92))
        make_face(mode=Mode.SUBTRACT)
    extrude(amount=MOVE_FACE1_DEPTH)


solid = part.part
